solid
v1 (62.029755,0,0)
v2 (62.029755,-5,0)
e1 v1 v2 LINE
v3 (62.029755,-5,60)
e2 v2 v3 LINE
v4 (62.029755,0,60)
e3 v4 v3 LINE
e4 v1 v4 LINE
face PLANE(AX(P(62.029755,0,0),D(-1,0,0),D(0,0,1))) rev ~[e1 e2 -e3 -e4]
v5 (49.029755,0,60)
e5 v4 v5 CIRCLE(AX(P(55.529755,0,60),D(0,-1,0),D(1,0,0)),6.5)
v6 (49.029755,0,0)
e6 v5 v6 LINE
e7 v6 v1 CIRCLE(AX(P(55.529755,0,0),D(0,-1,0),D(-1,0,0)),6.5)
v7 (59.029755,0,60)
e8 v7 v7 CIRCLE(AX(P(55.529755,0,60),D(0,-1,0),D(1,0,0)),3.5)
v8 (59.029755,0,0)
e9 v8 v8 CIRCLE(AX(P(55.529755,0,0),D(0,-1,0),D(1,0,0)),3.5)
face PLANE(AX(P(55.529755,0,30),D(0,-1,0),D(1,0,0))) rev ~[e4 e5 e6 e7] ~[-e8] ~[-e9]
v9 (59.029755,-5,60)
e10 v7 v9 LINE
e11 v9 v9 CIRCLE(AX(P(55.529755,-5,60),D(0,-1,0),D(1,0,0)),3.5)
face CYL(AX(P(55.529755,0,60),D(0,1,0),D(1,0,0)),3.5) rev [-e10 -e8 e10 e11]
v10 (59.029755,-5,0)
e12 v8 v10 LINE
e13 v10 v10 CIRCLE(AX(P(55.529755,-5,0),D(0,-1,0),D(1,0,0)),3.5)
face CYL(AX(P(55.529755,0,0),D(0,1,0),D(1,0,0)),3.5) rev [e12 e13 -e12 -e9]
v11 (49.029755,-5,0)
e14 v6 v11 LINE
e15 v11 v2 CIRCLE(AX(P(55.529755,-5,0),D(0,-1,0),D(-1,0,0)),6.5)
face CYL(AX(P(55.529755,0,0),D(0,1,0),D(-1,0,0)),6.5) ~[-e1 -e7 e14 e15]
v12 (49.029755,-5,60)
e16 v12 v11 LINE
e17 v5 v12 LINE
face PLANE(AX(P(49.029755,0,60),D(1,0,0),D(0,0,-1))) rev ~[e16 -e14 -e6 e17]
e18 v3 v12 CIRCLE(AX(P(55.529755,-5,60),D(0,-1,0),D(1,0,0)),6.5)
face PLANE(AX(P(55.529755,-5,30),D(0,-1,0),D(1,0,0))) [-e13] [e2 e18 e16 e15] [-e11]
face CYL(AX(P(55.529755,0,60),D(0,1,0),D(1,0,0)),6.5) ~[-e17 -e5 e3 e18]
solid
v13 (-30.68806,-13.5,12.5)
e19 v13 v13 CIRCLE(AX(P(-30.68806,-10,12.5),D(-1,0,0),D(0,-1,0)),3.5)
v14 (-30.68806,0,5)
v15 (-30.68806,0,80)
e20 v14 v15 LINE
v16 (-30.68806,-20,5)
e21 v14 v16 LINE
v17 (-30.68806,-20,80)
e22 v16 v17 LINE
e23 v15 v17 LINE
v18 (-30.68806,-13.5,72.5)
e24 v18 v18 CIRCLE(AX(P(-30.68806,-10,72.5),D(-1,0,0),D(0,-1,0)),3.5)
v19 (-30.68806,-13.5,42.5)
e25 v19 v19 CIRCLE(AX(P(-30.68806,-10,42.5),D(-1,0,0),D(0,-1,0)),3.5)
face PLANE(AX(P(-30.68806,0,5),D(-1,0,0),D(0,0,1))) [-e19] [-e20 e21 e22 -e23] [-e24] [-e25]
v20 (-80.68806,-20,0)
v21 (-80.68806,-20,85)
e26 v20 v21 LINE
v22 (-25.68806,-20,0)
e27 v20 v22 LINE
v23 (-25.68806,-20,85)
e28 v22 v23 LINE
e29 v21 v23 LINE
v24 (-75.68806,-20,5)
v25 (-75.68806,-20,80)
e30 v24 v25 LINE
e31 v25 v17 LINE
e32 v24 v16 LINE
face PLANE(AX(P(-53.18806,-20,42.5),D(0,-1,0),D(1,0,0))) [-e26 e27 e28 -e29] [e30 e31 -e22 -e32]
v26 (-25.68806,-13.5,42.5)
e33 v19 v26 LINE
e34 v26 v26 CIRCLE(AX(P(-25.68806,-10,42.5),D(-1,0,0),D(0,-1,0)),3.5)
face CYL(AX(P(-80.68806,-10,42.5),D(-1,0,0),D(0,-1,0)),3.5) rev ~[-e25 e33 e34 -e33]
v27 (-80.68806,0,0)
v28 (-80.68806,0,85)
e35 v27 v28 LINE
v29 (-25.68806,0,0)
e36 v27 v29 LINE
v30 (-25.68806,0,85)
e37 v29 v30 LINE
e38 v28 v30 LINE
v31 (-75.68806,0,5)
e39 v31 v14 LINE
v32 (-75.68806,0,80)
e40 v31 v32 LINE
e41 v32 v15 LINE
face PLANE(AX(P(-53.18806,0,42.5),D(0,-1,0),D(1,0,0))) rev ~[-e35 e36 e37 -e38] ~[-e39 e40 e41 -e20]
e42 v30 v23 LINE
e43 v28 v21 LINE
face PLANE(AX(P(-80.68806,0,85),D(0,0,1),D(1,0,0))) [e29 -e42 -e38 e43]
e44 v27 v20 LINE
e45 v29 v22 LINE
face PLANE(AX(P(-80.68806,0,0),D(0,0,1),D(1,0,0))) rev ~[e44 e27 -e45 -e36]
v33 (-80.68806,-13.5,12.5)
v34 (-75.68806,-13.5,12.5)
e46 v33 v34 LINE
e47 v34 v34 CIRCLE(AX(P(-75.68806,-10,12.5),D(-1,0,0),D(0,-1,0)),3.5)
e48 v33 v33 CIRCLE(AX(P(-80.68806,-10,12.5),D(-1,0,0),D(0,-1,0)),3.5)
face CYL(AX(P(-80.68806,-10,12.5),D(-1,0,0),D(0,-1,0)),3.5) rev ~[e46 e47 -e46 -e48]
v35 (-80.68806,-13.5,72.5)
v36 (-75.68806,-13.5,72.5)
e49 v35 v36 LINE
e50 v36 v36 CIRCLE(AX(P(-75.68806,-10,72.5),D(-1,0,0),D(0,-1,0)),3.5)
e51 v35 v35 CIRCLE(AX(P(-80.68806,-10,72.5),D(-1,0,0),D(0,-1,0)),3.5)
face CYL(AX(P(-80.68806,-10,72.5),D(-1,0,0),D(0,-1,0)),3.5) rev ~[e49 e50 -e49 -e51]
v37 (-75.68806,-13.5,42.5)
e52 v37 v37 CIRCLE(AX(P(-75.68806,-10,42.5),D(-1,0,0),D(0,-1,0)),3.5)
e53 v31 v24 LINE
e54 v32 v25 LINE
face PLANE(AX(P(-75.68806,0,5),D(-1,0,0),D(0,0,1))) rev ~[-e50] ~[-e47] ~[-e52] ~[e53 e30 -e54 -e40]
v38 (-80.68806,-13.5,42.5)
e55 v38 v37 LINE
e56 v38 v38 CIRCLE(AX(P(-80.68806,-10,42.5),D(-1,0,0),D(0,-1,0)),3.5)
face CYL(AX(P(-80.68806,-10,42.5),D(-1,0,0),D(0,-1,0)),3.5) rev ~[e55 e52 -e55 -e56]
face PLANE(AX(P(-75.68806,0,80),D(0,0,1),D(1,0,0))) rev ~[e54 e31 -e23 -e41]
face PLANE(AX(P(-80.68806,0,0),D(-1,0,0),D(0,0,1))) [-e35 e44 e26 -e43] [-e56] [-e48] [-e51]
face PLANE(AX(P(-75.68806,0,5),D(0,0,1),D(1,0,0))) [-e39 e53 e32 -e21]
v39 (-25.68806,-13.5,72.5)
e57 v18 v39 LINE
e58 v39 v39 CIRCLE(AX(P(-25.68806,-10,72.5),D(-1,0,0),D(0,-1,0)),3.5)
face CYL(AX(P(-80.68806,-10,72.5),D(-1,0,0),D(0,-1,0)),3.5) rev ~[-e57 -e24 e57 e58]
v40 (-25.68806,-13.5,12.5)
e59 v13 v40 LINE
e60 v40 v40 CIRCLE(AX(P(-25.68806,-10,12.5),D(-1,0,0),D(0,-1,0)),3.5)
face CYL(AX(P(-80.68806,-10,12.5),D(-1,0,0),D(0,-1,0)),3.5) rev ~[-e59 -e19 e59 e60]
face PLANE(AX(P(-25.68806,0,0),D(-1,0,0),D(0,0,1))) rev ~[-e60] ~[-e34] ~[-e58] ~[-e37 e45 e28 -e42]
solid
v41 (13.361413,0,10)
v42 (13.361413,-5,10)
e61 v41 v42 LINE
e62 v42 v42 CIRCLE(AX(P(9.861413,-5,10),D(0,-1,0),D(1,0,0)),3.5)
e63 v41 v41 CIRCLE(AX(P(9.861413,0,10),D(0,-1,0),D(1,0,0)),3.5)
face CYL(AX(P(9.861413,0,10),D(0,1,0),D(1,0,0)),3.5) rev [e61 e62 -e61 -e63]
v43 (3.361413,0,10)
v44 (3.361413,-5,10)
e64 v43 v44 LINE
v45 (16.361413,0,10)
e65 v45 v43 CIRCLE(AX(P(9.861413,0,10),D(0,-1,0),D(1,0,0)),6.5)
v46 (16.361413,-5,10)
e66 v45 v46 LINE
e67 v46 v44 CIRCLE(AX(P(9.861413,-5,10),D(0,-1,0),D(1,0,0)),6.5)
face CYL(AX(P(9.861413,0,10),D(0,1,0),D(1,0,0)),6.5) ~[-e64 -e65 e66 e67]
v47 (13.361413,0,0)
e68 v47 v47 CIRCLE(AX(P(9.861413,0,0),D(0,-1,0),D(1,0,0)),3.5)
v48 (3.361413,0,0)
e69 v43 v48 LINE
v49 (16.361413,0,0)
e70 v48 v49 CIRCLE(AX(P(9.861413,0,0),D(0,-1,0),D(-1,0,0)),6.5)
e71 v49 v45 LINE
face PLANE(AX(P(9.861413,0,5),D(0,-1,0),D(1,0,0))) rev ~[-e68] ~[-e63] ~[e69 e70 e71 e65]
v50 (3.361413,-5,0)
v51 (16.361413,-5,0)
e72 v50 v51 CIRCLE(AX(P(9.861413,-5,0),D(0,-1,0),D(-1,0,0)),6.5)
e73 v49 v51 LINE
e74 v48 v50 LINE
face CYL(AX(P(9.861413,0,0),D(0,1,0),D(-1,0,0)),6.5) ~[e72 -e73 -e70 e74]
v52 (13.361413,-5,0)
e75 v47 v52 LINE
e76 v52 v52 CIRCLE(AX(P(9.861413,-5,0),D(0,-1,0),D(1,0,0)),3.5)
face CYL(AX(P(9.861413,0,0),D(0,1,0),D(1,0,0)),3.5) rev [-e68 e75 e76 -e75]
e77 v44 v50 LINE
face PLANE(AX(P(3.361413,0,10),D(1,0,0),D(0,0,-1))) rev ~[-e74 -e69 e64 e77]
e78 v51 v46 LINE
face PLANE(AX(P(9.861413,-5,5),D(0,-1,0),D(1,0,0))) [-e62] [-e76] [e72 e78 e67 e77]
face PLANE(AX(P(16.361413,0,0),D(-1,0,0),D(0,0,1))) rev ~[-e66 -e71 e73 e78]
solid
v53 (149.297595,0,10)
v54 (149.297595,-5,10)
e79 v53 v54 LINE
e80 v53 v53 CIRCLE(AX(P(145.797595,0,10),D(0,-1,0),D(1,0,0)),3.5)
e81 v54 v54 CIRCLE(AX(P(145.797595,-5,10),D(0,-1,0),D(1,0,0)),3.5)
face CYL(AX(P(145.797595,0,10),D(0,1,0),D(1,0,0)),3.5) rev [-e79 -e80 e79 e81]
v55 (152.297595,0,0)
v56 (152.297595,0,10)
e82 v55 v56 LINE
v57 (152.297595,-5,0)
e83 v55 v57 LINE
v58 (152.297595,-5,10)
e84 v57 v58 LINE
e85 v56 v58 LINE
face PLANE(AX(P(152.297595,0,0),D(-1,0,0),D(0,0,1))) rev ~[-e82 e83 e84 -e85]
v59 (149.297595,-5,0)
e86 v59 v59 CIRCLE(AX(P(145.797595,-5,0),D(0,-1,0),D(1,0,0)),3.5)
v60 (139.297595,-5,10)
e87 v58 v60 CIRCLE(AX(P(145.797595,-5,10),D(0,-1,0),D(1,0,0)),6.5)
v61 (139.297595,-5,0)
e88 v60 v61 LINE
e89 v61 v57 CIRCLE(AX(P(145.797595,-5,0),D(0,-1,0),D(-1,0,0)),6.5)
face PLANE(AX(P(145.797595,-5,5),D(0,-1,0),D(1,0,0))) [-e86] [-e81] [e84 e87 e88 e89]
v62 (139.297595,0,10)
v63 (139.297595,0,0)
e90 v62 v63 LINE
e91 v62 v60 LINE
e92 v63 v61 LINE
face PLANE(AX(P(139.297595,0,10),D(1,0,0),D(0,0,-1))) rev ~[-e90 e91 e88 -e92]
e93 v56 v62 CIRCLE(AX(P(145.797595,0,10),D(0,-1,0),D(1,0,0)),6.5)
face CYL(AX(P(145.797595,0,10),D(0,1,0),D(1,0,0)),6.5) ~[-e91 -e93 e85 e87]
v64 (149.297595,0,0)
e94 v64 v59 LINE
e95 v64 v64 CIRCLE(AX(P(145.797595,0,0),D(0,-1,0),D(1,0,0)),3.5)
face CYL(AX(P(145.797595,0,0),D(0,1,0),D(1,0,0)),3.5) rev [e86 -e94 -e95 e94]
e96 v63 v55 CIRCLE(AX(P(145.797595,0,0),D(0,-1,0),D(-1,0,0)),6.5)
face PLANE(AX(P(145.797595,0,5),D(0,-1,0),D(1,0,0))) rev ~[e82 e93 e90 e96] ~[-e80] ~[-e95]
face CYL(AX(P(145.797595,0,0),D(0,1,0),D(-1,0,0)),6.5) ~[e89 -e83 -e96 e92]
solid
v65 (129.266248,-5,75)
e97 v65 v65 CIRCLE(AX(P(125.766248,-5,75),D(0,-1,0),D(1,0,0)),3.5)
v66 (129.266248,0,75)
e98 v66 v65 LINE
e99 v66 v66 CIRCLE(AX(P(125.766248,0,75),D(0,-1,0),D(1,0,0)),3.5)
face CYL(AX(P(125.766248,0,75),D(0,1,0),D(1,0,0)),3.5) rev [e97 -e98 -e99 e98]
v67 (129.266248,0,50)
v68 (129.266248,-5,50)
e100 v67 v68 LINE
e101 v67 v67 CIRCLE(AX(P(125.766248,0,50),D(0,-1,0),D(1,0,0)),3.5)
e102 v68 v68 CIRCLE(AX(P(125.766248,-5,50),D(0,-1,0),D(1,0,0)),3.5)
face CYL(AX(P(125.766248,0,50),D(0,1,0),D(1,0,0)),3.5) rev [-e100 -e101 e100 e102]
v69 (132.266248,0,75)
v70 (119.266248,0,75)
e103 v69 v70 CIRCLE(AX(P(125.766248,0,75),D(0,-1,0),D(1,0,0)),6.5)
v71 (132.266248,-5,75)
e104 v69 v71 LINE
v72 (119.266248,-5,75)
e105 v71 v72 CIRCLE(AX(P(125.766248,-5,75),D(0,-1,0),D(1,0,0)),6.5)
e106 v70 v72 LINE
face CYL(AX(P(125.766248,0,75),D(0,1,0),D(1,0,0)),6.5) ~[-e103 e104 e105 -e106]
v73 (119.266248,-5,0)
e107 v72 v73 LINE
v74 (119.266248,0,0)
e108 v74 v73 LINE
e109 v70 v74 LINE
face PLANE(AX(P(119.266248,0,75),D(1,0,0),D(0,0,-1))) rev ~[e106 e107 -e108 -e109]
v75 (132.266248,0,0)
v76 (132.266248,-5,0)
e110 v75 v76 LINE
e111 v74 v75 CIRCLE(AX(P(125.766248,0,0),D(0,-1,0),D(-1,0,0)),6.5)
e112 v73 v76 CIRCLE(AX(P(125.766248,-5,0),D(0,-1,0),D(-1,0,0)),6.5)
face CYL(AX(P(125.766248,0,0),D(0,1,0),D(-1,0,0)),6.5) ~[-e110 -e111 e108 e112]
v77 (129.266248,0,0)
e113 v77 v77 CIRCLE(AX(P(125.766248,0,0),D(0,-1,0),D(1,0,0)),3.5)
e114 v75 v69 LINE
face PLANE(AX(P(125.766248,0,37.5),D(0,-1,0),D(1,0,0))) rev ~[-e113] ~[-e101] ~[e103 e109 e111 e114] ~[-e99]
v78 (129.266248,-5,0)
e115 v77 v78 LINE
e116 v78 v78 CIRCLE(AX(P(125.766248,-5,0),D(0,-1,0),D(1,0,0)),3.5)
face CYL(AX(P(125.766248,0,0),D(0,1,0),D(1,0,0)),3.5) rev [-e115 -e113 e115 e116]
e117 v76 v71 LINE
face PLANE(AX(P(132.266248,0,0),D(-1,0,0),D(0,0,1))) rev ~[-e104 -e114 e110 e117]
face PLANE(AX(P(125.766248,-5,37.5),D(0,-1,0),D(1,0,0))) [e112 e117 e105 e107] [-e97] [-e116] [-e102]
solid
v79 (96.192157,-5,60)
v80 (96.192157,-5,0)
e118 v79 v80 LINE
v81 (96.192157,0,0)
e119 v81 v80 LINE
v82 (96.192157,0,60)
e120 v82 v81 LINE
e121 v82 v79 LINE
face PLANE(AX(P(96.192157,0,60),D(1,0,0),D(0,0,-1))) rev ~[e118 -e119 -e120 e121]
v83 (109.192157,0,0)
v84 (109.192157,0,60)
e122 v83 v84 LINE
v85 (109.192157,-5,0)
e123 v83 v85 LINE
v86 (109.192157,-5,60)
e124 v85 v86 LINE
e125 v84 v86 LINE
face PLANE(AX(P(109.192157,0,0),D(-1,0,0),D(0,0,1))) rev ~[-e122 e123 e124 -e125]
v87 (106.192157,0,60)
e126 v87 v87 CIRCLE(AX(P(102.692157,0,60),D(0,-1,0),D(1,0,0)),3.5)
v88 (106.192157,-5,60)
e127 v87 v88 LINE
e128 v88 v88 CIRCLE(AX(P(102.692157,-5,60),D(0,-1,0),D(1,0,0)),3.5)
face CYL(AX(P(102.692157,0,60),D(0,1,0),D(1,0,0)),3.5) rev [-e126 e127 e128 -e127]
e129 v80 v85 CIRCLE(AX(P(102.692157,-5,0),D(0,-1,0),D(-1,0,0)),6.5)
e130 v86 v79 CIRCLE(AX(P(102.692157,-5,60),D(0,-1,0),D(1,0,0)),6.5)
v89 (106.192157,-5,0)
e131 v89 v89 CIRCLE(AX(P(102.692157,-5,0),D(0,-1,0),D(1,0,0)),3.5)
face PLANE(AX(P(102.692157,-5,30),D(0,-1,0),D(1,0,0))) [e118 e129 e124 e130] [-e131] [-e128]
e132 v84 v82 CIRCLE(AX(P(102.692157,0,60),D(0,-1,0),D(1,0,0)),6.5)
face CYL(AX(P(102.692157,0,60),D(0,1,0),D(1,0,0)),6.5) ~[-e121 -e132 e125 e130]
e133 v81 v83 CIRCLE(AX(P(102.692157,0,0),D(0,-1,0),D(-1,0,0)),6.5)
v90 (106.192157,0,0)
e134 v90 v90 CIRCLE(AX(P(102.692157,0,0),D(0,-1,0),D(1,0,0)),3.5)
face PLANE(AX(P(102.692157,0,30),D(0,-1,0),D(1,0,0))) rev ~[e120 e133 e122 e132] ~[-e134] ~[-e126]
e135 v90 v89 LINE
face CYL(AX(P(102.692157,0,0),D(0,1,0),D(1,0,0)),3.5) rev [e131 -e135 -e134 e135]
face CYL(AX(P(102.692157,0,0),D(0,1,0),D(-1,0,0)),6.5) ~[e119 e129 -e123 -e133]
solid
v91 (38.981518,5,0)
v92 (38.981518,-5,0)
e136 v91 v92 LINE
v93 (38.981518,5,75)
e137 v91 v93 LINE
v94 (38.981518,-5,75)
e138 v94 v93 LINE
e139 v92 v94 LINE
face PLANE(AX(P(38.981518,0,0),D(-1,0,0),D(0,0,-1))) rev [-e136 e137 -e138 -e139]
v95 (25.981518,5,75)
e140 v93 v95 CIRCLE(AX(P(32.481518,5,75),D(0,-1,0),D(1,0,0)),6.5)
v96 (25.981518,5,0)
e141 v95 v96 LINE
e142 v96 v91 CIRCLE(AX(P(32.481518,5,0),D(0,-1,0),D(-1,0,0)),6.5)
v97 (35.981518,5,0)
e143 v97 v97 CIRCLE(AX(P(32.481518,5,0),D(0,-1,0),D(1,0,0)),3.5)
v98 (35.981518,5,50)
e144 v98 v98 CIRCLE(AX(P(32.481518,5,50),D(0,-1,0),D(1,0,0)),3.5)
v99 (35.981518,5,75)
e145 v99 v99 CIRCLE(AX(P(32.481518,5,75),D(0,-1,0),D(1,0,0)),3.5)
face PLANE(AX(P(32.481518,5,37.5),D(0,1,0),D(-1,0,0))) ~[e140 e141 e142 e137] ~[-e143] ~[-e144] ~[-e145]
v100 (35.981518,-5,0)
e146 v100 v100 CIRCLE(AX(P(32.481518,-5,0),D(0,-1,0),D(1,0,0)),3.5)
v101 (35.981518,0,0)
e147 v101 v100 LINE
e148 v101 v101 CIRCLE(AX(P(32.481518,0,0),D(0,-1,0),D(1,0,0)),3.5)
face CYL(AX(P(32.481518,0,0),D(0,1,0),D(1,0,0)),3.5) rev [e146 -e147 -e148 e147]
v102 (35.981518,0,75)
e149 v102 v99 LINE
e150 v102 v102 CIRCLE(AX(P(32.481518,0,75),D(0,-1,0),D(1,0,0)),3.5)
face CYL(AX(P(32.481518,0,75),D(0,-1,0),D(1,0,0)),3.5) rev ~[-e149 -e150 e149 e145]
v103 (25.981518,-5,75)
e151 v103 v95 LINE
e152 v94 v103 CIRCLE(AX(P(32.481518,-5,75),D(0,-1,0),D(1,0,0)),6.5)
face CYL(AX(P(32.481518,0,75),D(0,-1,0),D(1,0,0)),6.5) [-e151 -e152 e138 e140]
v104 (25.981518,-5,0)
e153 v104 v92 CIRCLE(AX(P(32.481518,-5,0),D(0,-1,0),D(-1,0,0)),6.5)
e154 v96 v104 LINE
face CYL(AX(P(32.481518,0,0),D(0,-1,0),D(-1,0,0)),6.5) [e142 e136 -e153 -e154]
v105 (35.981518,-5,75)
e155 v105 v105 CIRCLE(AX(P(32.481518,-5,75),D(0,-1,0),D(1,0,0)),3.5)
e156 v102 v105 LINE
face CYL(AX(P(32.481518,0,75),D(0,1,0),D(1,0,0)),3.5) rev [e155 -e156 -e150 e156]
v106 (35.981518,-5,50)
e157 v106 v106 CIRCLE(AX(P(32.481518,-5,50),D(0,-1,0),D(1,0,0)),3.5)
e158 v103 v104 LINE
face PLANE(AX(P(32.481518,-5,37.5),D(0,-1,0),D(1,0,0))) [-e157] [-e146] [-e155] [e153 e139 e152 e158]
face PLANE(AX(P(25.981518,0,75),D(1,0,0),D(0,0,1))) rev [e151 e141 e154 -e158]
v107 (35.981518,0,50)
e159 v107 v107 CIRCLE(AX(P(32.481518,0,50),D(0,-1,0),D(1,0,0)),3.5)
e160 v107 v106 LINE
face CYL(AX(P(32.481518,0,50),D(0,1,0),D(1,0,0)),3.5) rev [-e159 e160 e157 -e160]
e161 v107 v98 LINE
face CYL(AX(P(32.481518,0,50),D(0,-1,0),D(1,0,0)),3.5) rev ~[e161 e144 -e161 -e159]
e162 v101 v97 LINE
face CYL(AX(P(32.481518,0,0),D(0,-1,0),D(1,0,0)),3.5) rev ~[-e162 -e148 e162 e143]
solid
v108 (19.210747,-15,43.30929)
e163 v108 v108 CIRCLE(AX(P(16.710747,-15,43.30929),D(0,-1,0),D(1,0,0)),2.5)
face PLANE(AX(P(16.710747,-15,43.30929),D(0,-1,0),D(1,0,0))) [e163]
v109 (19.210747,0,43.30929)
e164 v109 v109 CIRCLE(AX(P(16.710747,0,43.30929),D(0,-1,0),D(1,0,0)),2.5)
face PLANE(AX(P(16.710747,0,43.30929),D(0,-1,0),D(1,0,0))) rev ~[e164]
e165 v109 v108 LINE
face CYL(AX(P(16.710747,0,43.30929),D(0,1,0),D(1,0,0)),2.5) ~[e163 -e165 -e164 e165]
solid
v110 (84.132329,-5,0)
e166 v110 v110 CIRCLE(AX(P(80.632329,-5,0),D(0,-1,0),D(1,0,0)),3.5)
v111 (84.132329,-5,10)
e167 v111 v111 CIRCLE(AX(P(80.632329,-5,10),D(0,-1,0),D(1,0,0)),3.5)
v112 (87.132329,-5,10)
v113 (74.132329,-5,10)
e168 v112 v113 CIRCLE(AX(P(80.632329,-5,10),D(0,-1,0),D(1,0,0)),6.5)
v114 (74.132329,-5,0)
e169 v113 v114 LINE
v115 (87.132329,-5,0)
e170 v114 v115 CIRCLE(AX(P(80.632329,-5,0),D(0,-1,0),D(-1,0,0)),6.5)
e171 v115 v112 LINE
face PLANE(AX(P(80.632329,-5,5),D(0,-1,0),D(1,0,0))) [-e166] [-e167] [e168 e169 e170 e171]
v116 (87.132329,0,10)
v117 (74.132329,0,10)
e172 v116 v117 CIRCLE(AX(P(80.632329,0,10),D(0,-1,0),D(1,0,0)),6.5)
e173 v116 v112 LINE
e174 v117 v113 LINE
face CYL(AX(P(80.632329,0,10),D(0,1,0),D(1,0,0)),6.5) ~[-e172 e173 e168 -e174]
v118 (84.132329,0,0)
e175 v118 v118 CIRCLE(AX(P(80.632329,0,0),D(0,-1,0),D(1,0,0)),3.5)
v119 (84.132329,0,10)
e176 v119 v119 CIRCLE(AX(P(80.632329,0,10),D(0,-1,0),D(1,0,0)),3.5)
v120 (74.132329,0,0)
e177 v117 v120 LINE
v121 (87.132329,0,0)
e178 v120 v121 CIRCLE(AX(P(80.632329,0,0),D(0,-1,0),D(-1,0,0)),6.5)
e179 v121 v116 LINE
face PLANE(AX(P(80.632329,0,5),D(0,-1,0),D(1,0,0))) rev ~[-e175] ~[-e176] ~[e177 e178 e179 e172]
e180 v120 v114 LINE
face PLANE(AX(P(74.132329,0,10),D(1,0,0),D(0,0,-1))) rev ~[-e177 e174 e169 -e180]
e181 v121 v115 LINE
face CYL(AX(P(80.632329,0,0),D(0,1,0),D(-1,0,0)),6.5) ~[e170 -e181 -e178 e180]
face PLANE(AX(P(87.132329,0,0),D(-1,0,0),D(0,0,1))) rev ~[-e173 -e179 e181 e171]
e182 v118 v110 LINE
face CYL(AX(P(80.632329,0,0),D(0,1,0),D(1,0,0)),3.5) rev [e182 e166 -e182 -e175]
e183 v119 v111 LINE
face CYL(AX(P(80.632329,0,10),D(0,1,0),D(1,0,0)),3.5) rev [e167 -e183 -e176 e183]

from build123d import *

# Parameters (mm, degrees)
F1_R     = 3.5
F2_DEPTH = 5
F3_R     = 2.5
F4_DEPTH = 15
F5_W     = 55
F5_H     = 85
F5_W_2   = 45
F5_H_2   = 75
F6_DEPTH = 20
F7_R     = 3.5
F8_DEPTH = 55


with BuildPart() as f2:
    # F1 (on Front) → F2 (new body)
    with BuildSketch(Plane.XZ):
        with BuildLine():
            Line((3.3614133894, 10), (3.3614133894, 0))
            ThreePointArc((3.3614133894, 0), (9.8614133894, -6.5), (16.3614133894, 0))
            Line((16.3614133894, 0), (16.3614133894, 10))
            ThreePointArc((16.3614133894, 10), (9.8614133894, 16.5), (3.3614133894, 10))
        make_face()
        with Locations((9.8614133894, 0)):
            Circle(F1_R, mode=Mode.SUBTRACT)
        with Locations((9.8614133894, 10)):
            Circle(F1_R, mode=Mode.SUBTRACT)
    extrude(amount=F2_DEPTH)


with BuildPart() as f2b:
    # F1 (on Front) → F2, piece 2 (new body)
    with BuildSketch(Plane.XZ):
        with BuildLine():
            Line((25.9815175587, 75), (25.9815175587, 0))
            ThreePointArc((25.9815175587, 0), (32.4815175587, -6.5), (38.9815175587, 0))
            Line((38.9815175587, 0), (38.9815175587, 75))
            ThreePointArc((38.9815175587, 75), (32.4815175587, 81.5), (25.9815175587, 75))
        make_face()
        with Locations((32.4815175587, 0)):
            Circle(F1_R, mode=Mode.SUBTRACT)
        with Locations((32.4815175587, 50)):
            Circle(F1_R, mode=Mode.SUBTRACT)
        with Locations((32.4815175587, 75)):
            Circle(F1_R, mode=Mode.SUBTRACT)
    extrude(amount=F2_DEPTH)

    # F9: F2b across plane


with BuildPart() as f2c:
    # F1 (on Front) → F2, piece 3 (new body)
    with BuildSketch(Plane.XZ):
        with BuildLine():
            Line((49.0297546089, 60), (49.0297546089, 0))
            ThreePointArc((49.0297546089, 0), (55.5297546089, -6.5), (62.0297546089, 0))
            Line((62.0297546089, 0), (62.0297546089, 60))
            ThreePointArc((62.0297546089, 60), (55.5297546089, 66.5), (49.0297546089, 60))
        make_face()
        with Locations((55.5297546089, 0)):
            Circle(F1_R, mode=Mode.SUBTRACT)
        with Locations((55.5297546089, 60)):
            Circle(F1_R, mode=Mode.SUBTRACT)
    extrude(amount=F2_DEPTH)


with BuildPart() as f2d:
    # F1 (on Front) → F2, piece 4 (new body)
    with BuildSketch(Plane.XZ):
        with BuildLine():
            Line((74.1323289871, 10), (74.1323289871, 0))
            ThreePointArc((74.1323289871, 0), (80.6323289871, -6.5), (87.1323289871, 0))
            Line((87.1323289871, 0), (87.1323289871, 10))
            ThreePointArc((87.1323289871, 10), (80.6323289871, 16.5), (74.1323289871, 10))
        make_face()
        with Locations((80.6323289871, 0)):
            Circle(F1_R, mode=Mode.SUBTRACT)
        with Locations((80.6323289871, 10)):
            Circle(F1_R, mode=Mode.SUBTRACT)
    extrude(amount=F2_DEPTH)


with BuildPart() as f2e:
    # F1 (on Front) → F2, piece 5 (new body)
    with BuildSketch(Plane.XZ):
        with BuildLine():
            Line((96.1921570301, 60), (96.1921570301, 0))
            ThreePointArc((96.1921570301, 0), (102.6921570301, -6.5), (109.1921570301, 0))
            Line((109.1921570301, 0), (109.1921570301, 60))
            ThreePointArc((109.1921570301, 60), (102.6921570301, 66.5), (96.1921570301, 60))
        make_face()
        with Locations((102.6921570301, 0)):
            Circle(F1_R, mode=Mode.SUBTRACT)
        with Locations((102.6921570301, 60)):
            Circle(F1_R, mode=Mode.SUBTRACT)
    extrude(amount=F2_DEPTH)


with BuildPart() as f2f:
    # F1 (on Front) → F2, piece 6 (new body)
    with BuildSketch(Plane.XZ):
        with BuildLine():
            Line((119.2662475109, 75), (119.2662475109, 0))
            ThreePointArc((119.2662475109, 0), (125.7662475109, -6.5), (132.2662475109, 0))
            Line((132.2662475109, 0), (132.2662475109, 75))
            ThreePointArc((132.2662475109, 75), (125.7662475109, 81.5), (119.2662475109, 75))
        make_face()
        with Locations((125.7662475109, 0)):
            Circle(F1_R, mode=Mode.SUBTRACT)
        with Locations((125.7662475109, 50)):
            Circle(F1_R, mode=Mode.SUBTRACT)
        with Locations((125.7662475109, 75)):
            Circle(F1_R, mode=Mode.SUBTRACT)
    extrude(amount=F2_DEPTH)


with BuildPart() as f2g:
    # F1 (on Front) → F2, piece 7 (new body)
    with BuildSketch(Plane.XZ):
        with BuildLine():
            Line((139.2975953817, 10), (139.2975953817, 0))
            ThreePointArc((139.2975953817, 0), (145.7975953817, -6.5), (152.2975953817, 0))
            Line((152.2975953817, 0), (152.2975953817, 10))
            ThreePointArc((152.2975953817, 10), (145.7975953817, 16.5), (139.2975953817, 10))
        make_face()
        with Locations((145.7975953817, 0)):
            Circle(F1_R, mode=Mode.SUBTRACT)
        with Locations((145.7975953817, 10)):
            Circle(F1_R, mode=Mode.SUBTRACT)
    extrude(amount=F2_DEPTH)


with BuildPart() as f4:
    # F3 (on Front) → F4 (new body)
    with BuildSketch(Plane.XZ):
        with Locations((16.7107470334, 43.3092899621)):
            Circle(F3_R)
    extrude(amount=F4_DEPTH)


with BuildPart() as f6:
    # F5 (on Front) → F6 (new body)
    with BuildSketch(Plane.XZ):
        with Locations((-53.1880603731, 42.5)):
            Rectangle(F5_W, F5_H)
        with Locations((-53.1880603731, 42.5)):
            Rectangle(F5_W_2, F5_H_2, mode=Mode.SUBTRACT)
    extrude(amount=F6_DEPTH)

    # F7 (on face) → F8 (cut, through all)
    with BuildSketch(Plane(origin=(-80.6880603731, 0, 0), x_dir=(0, -1, 0), z_dir=(-1, 0, 0))):
        with Locations((10, 72.5)):
            Circle(F7_R)
        with Locations((10, 42.5)):
            Circle(F7_R)
        with Locations((10, 12.5)):
            Circle(F7_R)
    extrude(amount=-F8_DEPTH, mode=Mode.SUBTRACT)


with BuildPart() as f2b_1:
    add(f2b.part)
    add(f2b.part.mirror(Plane.XZ))


solid = Compound([f2.part, f2c.part, f2d.part, f2e.part, f2f.part, f2g.part, f4.part, f6.part, f2b_1.part])
